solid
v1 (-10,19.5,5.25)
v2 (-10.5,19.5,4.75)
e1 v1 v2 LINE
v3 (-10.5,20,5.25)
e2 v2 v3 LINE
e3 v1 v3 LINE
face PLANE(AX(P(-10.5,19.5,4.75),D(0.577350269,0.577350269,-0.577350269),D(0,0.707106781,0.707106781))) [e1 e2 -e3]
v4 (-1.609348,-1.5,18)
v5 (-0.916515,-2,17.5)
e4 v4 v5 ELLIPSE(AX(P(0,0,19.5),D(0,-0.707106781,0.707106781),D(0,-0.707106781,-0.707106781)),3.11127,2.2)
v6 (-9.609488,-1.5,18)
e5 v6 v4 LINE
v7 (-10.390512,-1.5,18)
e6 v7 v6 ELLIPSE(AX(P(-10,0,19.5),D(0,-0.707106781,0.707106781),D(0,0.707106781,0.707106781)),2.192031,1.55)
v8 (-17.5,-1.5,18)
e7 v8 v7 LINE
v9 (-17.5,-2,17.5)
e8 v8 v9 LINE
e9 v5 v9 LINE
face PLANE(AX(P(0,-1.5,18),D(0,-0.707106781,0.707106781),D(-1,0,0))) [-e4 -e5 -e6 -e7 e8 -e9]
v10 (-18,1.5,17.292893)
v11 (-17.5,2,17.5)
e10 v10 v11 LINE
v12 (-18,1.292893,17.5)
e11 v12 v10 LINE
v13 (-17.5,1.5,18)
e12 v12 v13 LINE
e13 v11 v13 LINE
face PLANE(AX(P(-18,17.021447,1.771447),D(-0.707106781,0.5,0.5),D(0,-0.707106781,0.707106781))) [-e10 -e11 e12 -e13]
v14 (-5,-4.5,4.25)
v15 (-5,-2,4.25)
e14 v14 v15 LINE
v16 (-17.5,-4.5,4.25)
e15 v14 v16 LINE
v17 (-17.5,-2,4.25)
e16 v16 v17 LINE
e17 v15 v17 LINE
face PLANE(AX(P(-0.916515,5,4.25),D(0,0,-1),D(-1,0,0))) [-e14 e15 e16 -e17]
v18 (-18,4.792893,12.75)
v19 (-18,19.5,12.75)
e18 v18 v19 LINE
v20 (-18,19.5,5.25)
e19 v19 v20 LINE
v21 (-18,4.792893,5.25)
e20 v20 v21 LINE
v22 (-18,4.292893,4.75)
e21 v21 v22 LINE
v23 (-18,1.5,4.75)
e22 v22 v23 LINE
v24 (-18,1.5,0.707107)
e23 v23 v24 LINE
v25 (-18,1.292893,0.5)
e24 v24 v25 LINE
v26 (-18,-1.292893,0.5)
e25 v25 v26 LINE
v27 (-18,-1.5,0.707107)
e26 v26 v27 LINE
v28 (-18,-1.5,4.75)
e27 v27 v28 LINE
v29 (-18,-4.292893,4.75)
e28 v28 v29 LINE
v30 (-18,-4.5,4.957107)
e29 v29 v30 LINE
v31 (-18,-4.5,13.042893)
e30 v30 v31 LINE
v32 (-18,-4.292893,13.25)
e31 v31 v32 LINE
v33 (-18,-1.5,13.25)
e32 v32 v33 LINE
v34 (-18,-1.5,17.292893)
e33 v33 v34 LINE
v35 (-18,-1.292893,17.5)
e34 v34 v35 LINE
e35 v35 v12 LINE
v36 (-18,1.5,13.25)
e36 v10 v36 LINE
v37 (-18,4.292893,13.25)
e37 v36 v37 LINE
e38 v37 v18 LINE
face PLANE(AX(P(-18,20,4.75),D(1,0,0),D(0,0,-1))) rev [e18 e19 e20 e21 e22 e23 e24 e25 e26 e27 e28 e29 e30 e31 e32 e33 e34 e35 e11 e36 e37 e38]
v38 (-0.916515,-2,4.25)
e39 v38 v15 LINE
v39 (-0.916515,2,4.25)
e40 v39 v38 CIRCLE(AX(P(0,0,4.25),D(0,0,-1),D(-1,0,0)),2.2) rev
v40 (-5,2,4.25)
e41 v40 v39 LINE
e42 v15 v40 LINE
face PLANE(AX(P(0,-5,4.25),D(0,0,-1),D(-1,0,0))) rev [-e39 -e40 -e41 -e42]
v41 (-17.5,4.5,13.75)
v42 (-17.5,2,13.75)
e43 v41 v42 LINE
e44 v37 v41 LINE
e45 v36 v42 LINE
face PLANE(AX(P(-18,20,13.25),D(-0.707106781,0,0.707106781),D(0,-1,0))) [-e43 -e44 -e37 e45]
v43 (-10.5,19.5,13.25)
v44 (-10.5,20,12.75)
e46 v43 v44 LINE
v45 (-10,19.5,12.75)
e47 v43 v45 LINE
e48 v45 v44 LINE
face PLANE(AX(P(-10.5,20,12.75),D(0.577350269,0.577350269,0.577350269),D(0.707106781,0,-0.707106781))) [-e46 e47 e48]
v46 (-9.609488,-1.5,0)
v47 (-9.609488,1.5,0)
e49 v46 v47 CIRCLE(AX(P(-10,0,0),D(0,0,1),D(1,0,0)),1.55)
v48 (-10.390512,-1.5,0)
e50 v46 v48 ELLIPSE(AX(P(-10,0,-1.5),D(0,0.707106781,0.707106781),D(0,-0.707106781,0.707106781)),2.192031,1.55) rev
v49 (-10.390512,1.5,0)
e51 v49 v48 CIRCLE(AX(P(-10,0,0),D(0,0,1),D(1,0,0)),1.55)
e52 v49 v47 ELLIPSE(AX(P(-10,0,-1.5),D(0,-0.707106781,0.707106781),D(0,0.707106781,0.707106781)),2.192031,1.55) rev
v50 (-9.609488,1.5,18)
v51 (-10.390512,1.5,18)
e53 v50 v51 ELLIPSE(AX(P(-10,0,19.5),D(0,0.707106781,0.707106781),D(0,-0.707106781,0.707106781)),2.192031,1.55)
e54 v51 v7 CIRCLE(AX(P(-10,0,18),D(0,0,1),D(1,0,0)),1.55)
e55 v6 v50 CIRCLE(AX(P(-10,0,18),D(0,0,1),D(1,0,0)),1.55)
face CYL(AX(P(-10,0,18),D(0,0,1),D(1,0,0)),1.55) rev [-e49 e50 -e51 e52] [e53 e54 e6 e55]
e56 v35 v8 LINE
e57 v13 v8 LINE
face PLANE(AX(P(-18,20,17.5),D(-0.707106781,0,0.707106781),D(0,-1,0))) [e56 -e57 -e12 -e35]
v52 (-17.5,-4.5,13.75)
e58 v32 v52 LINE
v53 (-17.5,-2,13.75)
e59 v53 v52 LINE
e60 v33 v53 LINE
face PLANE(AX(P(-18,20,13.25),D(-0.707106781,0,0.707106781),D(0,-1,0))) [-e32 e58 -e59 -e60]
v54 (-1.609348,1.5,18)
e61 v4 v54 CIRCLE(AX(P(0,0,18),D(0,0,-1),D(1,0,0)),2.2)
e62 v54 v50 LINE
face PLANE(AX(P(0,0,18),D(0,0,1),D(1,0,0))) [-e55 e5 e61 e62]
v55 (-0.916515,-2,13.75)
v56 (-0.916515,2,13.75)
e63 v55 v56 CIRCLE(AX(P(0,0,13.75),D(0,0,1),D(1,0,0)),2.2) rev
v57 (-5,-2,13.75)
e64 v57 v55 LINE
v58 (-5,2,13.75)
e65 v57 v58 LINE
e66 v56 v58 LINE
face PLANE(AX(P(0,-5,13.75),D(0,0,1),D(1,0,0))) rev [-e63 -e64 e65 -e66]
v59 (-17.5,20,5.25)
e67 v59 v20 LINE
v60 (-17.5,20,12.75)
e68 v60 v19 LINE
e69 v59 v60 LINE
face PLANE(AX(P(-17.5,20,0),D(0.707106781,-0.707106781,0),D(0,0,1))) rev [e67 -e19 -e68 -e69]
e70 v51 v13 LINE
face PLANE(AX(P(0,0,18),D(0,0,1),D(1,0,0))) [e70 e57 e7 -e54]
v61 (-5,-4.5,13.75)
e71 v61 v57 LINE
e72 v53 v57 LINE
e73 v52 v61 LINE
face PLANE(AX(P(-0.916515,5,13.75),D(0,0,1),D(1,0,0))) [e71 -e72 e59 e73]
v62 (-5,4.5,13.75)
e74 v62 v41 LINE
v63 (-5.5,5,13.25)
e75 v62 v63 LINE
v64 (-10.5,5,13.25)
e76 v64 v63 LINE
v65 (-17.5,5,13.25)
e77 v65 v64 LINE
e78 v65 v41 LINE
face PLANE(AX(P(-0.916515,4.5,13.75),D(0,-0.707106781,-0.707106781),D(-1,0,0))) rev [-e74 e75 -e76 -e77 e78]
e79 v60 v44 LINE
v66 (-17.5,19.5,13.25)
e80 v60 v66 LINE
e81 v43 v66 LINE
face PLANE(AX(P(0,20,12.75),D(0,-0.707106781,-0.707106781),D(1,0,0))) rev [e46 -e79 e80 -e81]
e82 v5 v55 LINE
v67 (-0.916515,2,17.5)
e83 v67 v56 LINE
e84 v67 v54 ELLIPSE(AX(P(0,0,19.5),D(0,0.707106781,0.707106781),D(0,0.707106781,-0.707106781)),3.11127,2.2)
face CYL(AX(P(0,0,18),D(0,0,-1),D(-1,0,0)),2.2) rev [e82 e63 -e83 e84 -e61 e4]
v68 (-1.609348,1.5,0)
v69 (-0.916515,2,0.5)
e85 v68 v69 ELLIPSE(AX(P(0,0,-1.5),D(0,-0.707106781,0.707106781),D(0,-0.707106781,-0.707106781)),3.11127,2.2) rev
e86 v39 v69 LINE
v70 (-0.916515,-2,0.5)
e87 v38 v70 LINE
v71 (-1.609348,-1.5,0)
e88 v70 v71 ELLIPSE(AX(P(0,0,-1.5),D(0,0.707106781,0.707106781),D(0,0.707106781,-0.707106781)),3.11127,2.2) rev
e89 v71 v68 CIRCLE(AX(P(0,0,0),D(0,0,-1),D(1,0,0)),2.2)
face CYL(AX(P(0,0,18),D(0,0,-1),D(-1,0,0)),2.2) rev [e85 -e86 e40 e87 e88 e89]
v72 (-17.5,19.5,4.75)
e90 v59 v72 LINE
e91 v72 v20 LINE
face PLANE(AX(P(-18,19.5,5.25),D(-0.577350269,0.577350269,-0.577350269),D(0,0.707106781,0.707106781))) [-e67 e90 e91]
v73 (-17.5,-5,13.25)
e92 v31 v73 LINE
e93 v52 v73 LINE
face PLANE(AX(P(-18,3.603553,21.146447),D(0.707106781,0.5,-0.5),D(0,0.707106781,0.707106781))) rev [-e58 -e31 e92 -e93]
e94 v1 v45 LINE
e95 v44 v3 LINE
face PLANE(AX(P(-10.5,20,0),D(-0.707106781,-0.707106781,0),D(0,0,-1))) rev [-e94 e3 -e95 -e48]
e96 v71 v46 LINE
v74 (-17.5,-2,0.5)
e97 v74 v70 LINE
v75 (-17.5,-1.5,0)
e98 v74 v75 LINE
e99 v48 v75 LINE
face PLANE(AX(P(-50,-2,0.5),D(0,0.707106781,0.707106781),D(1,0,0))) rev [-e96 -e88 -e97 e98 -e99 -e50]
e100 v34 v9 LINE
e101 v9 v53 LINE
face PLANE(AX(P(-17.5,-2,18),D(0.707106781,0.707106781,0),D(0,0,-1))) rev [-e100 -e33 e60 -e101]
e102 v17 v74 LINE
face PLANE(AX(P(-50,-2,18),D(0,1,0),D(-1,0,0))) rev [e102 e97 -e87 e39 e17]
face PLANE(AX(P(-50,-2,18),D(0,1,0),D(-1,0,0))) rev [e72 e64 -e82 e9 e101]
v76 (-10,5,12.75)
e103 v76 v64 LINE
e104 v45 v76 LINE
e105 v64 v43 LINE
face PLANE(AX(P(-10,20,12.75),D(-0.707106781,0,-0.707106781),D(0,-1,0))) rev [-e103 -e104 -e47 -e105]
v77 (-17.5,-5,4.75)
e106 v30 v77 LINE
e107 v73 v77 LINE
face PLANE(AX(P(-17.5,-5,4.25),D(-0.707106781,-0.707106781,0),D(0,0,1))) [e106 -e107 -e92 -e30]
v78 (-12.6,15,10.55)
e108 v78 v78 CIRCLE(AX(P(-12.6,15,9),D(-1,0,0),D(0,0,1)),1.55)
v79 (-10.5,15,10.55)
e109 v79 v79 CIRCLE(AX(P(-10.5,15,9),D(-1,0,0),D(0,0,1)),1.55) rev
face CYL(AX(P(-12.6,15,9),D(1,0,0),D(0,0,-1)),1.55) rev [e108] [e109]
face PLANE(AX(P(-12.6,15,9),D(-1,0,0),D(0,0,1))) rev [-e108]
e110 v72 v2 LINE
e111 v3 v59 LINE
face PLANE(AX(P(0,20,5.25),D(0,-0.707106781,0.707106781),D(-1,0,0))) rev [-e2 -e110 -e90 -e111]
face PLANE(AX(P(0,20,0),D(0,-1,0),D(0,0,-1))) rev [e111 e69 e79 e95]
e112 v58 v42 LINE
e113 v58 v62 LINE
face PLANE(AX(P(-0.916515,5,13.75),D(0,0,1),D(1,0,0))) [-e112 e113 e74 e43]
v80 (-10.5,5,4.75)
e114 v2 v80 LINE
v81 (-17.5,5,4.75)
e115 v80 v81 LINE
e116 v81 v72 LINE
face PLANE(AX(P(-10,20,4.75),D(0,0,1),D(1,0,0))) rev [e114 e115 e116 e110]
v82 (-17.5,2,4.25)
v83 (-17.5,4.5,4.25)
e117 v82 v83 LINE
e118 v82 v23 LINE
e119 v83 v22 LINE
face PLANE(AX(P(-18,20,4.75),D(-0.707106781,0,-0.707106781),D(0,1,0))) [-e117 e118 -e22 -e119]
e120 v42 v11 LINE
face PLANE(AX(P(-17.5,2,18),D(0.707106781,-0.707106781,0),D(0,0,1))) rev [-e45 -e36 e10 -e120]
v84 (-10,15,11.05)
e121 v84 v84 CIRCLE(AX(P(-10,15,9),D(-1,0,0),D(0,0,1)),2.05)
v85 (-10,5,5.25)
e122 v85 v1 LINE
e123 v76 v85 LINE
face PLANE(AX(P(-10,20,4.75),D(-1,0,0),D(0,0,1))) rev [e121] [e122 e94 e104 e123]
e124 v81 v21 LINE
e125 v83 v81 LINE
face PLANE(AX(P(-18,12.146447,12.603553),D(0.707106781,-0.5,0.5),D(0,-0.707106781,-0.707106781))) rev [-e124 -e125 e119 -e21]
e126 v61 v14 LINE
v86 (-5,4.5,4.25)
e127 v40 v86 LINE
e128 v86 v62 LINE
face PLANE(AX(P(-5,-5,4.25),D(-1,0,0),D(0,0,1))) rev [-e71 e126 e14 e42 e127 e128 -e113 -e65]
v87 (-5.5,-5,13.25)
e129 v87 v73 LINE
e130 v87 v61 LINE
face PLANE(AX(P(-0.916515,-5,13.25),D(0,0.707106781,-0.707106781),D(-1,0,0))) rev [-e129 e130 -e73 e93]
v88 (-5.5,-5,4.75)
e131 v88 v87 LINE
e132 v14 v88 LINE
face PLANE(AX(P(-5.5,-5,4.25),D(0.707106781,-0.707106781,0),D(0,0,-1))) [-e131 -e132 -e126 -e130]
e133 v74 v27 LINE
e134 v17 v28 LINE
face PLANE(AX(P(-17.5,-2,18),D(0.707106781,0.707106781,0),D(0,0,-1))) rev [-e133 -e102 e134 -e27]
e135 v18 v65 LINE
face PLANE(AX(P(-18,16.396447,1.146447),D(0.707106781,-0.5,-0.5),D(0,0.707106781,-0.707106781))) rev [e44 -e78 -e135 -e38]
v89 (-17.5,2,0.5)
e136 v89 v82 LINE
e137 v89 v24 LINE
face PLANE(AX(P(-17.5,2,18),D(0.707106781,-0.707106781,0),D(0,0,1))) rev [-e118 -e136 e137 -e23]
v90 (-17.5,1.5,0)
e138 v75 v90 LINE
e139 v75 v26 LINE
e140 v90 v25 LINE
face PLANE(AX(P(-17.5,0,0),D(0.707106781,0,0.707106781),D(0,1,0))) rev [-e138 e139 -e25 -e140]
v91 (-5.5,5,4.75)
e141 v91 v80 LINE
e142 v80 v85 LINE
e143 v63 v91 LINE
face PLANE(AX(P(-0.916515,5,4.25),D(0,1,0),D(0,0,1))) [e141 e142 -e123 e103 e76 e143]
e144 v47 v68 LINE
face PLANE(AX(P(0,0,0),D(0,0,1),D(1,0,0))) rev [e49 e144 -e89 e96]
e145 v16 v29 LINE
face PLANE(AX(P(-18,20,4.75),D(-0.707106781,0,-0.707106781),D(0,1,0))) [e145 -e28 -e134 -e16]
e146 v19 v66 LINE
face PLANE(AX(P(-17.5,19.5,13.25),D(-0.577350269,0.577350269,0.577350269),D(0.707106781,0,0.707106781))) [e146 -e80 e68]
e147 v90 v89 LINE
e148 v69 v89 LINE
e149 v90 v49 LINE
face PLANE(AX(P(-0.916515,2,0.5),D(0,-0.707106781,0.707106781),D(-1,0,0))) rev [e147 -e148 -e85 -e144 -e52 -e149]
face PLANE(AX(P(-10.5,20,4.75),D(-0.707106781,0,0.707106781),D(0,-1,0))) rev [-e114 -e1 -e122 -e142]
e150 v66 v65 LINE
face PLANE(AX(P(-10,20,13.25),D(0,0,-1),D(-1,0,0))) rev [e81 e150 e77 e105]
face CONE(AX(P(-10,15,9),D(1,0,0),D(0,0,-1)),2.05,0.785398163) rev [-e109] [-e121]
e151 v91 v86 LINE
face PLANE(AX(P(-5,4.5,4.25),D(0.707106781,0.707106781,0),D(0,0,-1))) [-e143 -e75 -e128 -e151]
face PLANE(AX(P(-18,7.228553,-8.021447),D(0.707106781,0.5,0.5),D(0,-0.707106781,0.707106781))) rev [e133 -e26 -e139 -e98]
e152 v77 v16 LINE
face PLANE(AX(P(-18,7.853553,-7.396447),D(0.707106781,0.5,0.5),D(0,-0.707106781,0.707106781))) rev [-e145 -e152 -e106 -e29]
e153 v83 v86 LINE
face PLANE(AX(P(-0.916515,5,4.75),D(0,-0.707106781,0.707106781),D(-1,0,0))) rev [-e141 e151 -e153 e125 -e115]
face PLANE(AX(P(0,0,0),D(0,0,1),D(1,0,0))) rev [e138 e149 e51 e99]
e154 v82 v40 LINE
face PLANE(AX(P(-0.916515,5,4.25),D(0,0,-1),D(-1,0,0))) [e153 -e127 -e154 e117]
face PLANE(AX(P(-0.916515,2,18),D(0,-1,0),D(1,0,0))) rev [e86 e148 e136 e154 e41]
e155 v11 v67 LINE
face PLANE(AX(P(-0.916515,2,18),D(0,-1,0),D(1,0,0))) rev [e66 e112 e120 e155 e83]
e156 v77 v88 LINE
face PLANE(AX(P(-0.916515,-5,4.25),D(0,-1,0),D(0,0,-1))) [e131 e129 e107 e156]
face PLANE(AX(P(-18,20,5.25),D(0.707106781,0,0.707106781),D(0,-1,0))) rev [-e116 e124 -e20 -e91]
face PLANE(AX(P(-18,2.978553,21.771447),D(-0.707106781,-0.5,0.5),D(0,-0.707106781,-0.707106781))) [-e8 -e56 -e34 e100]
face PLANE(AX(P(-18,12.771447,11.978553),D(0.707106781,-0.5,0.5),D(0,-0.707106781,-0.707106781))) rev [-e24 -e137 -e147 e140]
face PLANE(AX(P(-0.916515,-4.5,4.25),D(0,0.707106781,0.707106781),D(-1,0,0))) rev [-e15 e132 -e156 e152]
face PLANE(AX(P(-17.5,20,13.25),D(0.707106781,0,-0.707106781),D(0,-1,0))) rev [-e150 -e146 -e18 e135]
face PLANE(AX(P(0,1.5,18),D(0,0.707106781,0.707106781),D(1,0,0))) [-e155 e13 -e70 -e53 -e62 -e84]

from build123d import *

# Parameters (mm, degrees)
BOSS_EXTRUDE1_DEPTH  = 18
BOSS_EXTRUDE2_START  = -49.083485
SKETCH2_W            = 9.5
SKETCH2_H            = 10
BOSS_EXTRUDE2_DEPTH  = 49.083485
M3_CLEARANCE_HOLE1_D = 3.1
BOSS_EXTRUDE3_DEPTH  = 1.5
CHAMFER1_SIZE        = 0.5
SKETCH8_W            = 5
SKETCH8_H            = 9.5
CUT_EXTRUDE1_DEPTH   = 56.463952257
SKETCH9_W            = 8
SKETCH9_H            = 8.5
BOSS_EXTRUDE4_DEPTH  = 15
SKETCH13_W           = 33.5
SKETCH13_H           = 18
CUT_EXTRUDE5_DEPTH   = 61.010415763
SKETCH10_R           = 1.55
CUT_EXTRUDE6_DEPTH   = 2.6
CHAMFER2_SIZE        = 0.5


with BuildPart() as part:
    # Sketch1 → Boss-Extrude1 (new body)
    with BuildSketch(Plane.XY):
        with BuildLine():
            Line((-0.916515139, 2), (-50, 2))
            Line((-50, 2), (-50, -2))
            Line((-50, -2), (-0.916515139, -2))
            ThreePointArc((-0.916515139, -2), (-2.2, 0), (-0.916515139, 2))
        make_face()
    extrude(amount=BOSS_EXTRUDE1_DEPTH)

    # Sketch2 → Boss-Extrude2 (add)
    with BuildSketch(Plane.ZY.offset(50).offset(BOSS_EXTRUDE2_START)):
        with Locations((9, 0)):
            Rectangle(SKETCH2_W, SKETCH2_H)
    extrude(amount=BOSS_EXTRUDE2_DEPTH)

    # M3 Clearance Hole1 (through all)
    with Locations(Plane.XY.offset(18)):
        with Locations((-10, 0)):
            Hole(M3_CLEARANCE_HOLE1_D / 2)

    # Sketch7 → Boss-Extrude3 (add)
    with BuildSketch(Plane.ZY.offset(50)):
        Polygon((0, 2), (0, -2), (4.25, -2), (4.25, -5), (13.75, -5), (13.75, -2), (18, -2), (18, 2), (13.75, 2), (13.75, 5), (4.25, 5), (4.25, 2), align=None)
    extrude(amount=BOSS_EXTRUDE3_DEPTH)

    # Chamfer1
    # the kernel refuses this chamfer: 0.5 mm, written as the material it takes off along each edge
    with BuildSketch(Plane(origin=(-52.785841494, -2, 18), x_dir=(0, 0.9996219169112968, 0.027495876610589075), z_dir=(1, 0, 0)), Plane(origin=(0.369326355, 2, 0), x_dir=(0, 0.027495876610586494, 0.9996219169112968), z_dir=(-1, 0, 0))) as chamfer1_piece_1:
        Polygon((CHAMFER1_SIZE * 0.999621916911, -CHAMFER1_SIZE * 0.0274958766106), (-CHAMFER1_SIZE * 0.0274958766106, -CHAMFER1_SIZE * 0.999621916911), (0, 0), align=None)
    extrude(amount=53.155167849, mode=Mode.SUBTRACT)
    with BuildSketch(Plane(origin=(0.369326494, -5, 4.25), x_dir=(0, -0.027495876610585647, 0.9996219169112968), z_dir=(-1, 0, 0)), Plane(origin=(-52.785841494, 5, 4.25), x_dir=(0, 0.027495876610585647, 0.9996219169112968), z_dir=(1, 0, 0)), Plane(origin=(0.369326494, -5, 13.75), x_dir=(0, 0.9996219169112968, 0.027495876610585647), z_dir=(-1, 0, 0))) as chamfer1_piece_2:
        Polygon((CHAMFER1_SIZE * 0.999621916911, CHAMFER1_SIZE * 0.0274958766106), (-CHAMFER1_SIZE * 0.0274958766106, CHAMFER1_SIZE * 0.999621916911), (0, 0), align=None)
    extrude(amount=53.155167988, mode=Mode.SUBTRACT)
    with BuildSketch(Plane(origin=(-52.785841494, 5, 13.75), x_dir=(0, 0.027495876610585647, -0.9996219169112968), z_dir=(1, 0, 0))) as chamfer1_piece_3:
        Polygon((CHAMFER1_SIZE * 0.999621916911, -CHAMFER1_SIZE * 0.0274958766106), (-CHAMFER1_SIZE * 0.0274958766106, -CHAMFER1_SIZE * 0.999621916911), (0, 0), align=None)
    extrude(amount=53.155167988, mode=Mode.SUBTRACT)
    with BuildSketch(Plane(origin=(0.369326355, -2, 0), x_dir=(0, -0.027495876610586494, 0.9996219169112968), z_dir=(-1, 0, 0)), Plane(origin=(0.369326355, 2, 18), x_dir=(0, 0.027495876610586414, -0.9996219169112968), z_dir=(-1, 0, 0))) as chamfer1_piece_4:
        Polygon((CHAMFER1_SIZE * 0.999621916911, CHAMFER1_SIZE * 0.0274958766106), (-CHAMFER1_SIZE * 0.0274958766106, CHAMFER1_SIZE * 0.999621916911), (0, 0), align=None)
    extrude(amount=53.155167849, mode=Mode.SUBTRACT)

    # Sketch8 → Cut-Extrude1 (cut, through all)
    with BuildSketch(Plane(origin=(0, 5, 0), x_dir=(1, 0, 0), z_dir=(0, 1, 0))):
        with Locations((-2.5, -9)):
            Rectangle(SKETCH8_W, SKETCH8_H)
    extrude(amount=-CUT_EXTRUDE1_DEPTH, mode=Mode.SUBTRACT)

    # Sketch9 → Boss-Extrude4 (add)
    with BuildSketch(Plane(origin=(0, 5, 0), x_dir=(1, 0, 0), z_dir=(0, 1, 0))):
        with Locations((-14, -9)):
            Rectangle(SKETCH9_W, SKETCH9_H)
    extrude(amount=BOSS_EXTRUDE4_DEPTH)

    # Sketch13 → Cut-Extrude5 (cut, through all)
    with BuildSketch(Plane(origin=(0, 20, 0), x_dir=(1, 0, 0), z_dir=(0, 1, 0))):
        with Locations((-34.75, -9)):
            Rectangle(SKETCH13_W, SKETCH13_H)
    extrude(amount=-CUT_EXTRUDE5_DEPTH, mode=Mode.SUBTRACT)

    # Sketch10 → Cut-Extrude6 (cut)
    with BuildSketch(Plane.ZY.offset(10)):
        with Locations((9, 15)):
            Circle(SKETCH10_R)
    extrude(amount=CUT_EXTRUDE6_DEPTH, mode=Mode.SUBTRACT)

    # Chamfer2
    chamfer2_edges = [part.edges().sort_by_distance(p)[0] for p in [
        (-5, -5, 9),
        (-5, 5, 9),
        (-10, 12.5, 13.25),
        (-10, 12.5, 4.75),
        (-18, 12.5, 4.75),
        (-18, 12.5, 13.25),
        (-10, 20, 9),
        (-14, 20, 4.75),
        (-18, 20, 9),
        (-14, 20, 13.25),
        (-18, -3.25, 4.25),
        (-18, -4.75, 4.5),
        (-18, -1.75, 0.25),
        (-18, -4.75, 13.5),
        (-18, -3.25, 13.75),
        (-18, -1.75, 17.75),
        (-18, 1.75, 0.25),
        (-18, 4.75, 4.5),
        (-18, 3.25, 4.25),
        (-18, 1.75, 17.75),
        (-18, 3.25, 13.75),
        (-18, 4.75, 13.5),
        (-18, 2, 15.625),
        (-18, -2, 15.625),
        (-18, -5, 9),
        (-18, -2, 2.375),
        (-18, 0, 0),
        (-18, 2, 2.375),
        (-18, 0, 18),
        (-10, 15, 7.45),
    ]]
    chamfer(chamfer2_edges, length=CHAMFER2_SIZE)


solid = part.part
